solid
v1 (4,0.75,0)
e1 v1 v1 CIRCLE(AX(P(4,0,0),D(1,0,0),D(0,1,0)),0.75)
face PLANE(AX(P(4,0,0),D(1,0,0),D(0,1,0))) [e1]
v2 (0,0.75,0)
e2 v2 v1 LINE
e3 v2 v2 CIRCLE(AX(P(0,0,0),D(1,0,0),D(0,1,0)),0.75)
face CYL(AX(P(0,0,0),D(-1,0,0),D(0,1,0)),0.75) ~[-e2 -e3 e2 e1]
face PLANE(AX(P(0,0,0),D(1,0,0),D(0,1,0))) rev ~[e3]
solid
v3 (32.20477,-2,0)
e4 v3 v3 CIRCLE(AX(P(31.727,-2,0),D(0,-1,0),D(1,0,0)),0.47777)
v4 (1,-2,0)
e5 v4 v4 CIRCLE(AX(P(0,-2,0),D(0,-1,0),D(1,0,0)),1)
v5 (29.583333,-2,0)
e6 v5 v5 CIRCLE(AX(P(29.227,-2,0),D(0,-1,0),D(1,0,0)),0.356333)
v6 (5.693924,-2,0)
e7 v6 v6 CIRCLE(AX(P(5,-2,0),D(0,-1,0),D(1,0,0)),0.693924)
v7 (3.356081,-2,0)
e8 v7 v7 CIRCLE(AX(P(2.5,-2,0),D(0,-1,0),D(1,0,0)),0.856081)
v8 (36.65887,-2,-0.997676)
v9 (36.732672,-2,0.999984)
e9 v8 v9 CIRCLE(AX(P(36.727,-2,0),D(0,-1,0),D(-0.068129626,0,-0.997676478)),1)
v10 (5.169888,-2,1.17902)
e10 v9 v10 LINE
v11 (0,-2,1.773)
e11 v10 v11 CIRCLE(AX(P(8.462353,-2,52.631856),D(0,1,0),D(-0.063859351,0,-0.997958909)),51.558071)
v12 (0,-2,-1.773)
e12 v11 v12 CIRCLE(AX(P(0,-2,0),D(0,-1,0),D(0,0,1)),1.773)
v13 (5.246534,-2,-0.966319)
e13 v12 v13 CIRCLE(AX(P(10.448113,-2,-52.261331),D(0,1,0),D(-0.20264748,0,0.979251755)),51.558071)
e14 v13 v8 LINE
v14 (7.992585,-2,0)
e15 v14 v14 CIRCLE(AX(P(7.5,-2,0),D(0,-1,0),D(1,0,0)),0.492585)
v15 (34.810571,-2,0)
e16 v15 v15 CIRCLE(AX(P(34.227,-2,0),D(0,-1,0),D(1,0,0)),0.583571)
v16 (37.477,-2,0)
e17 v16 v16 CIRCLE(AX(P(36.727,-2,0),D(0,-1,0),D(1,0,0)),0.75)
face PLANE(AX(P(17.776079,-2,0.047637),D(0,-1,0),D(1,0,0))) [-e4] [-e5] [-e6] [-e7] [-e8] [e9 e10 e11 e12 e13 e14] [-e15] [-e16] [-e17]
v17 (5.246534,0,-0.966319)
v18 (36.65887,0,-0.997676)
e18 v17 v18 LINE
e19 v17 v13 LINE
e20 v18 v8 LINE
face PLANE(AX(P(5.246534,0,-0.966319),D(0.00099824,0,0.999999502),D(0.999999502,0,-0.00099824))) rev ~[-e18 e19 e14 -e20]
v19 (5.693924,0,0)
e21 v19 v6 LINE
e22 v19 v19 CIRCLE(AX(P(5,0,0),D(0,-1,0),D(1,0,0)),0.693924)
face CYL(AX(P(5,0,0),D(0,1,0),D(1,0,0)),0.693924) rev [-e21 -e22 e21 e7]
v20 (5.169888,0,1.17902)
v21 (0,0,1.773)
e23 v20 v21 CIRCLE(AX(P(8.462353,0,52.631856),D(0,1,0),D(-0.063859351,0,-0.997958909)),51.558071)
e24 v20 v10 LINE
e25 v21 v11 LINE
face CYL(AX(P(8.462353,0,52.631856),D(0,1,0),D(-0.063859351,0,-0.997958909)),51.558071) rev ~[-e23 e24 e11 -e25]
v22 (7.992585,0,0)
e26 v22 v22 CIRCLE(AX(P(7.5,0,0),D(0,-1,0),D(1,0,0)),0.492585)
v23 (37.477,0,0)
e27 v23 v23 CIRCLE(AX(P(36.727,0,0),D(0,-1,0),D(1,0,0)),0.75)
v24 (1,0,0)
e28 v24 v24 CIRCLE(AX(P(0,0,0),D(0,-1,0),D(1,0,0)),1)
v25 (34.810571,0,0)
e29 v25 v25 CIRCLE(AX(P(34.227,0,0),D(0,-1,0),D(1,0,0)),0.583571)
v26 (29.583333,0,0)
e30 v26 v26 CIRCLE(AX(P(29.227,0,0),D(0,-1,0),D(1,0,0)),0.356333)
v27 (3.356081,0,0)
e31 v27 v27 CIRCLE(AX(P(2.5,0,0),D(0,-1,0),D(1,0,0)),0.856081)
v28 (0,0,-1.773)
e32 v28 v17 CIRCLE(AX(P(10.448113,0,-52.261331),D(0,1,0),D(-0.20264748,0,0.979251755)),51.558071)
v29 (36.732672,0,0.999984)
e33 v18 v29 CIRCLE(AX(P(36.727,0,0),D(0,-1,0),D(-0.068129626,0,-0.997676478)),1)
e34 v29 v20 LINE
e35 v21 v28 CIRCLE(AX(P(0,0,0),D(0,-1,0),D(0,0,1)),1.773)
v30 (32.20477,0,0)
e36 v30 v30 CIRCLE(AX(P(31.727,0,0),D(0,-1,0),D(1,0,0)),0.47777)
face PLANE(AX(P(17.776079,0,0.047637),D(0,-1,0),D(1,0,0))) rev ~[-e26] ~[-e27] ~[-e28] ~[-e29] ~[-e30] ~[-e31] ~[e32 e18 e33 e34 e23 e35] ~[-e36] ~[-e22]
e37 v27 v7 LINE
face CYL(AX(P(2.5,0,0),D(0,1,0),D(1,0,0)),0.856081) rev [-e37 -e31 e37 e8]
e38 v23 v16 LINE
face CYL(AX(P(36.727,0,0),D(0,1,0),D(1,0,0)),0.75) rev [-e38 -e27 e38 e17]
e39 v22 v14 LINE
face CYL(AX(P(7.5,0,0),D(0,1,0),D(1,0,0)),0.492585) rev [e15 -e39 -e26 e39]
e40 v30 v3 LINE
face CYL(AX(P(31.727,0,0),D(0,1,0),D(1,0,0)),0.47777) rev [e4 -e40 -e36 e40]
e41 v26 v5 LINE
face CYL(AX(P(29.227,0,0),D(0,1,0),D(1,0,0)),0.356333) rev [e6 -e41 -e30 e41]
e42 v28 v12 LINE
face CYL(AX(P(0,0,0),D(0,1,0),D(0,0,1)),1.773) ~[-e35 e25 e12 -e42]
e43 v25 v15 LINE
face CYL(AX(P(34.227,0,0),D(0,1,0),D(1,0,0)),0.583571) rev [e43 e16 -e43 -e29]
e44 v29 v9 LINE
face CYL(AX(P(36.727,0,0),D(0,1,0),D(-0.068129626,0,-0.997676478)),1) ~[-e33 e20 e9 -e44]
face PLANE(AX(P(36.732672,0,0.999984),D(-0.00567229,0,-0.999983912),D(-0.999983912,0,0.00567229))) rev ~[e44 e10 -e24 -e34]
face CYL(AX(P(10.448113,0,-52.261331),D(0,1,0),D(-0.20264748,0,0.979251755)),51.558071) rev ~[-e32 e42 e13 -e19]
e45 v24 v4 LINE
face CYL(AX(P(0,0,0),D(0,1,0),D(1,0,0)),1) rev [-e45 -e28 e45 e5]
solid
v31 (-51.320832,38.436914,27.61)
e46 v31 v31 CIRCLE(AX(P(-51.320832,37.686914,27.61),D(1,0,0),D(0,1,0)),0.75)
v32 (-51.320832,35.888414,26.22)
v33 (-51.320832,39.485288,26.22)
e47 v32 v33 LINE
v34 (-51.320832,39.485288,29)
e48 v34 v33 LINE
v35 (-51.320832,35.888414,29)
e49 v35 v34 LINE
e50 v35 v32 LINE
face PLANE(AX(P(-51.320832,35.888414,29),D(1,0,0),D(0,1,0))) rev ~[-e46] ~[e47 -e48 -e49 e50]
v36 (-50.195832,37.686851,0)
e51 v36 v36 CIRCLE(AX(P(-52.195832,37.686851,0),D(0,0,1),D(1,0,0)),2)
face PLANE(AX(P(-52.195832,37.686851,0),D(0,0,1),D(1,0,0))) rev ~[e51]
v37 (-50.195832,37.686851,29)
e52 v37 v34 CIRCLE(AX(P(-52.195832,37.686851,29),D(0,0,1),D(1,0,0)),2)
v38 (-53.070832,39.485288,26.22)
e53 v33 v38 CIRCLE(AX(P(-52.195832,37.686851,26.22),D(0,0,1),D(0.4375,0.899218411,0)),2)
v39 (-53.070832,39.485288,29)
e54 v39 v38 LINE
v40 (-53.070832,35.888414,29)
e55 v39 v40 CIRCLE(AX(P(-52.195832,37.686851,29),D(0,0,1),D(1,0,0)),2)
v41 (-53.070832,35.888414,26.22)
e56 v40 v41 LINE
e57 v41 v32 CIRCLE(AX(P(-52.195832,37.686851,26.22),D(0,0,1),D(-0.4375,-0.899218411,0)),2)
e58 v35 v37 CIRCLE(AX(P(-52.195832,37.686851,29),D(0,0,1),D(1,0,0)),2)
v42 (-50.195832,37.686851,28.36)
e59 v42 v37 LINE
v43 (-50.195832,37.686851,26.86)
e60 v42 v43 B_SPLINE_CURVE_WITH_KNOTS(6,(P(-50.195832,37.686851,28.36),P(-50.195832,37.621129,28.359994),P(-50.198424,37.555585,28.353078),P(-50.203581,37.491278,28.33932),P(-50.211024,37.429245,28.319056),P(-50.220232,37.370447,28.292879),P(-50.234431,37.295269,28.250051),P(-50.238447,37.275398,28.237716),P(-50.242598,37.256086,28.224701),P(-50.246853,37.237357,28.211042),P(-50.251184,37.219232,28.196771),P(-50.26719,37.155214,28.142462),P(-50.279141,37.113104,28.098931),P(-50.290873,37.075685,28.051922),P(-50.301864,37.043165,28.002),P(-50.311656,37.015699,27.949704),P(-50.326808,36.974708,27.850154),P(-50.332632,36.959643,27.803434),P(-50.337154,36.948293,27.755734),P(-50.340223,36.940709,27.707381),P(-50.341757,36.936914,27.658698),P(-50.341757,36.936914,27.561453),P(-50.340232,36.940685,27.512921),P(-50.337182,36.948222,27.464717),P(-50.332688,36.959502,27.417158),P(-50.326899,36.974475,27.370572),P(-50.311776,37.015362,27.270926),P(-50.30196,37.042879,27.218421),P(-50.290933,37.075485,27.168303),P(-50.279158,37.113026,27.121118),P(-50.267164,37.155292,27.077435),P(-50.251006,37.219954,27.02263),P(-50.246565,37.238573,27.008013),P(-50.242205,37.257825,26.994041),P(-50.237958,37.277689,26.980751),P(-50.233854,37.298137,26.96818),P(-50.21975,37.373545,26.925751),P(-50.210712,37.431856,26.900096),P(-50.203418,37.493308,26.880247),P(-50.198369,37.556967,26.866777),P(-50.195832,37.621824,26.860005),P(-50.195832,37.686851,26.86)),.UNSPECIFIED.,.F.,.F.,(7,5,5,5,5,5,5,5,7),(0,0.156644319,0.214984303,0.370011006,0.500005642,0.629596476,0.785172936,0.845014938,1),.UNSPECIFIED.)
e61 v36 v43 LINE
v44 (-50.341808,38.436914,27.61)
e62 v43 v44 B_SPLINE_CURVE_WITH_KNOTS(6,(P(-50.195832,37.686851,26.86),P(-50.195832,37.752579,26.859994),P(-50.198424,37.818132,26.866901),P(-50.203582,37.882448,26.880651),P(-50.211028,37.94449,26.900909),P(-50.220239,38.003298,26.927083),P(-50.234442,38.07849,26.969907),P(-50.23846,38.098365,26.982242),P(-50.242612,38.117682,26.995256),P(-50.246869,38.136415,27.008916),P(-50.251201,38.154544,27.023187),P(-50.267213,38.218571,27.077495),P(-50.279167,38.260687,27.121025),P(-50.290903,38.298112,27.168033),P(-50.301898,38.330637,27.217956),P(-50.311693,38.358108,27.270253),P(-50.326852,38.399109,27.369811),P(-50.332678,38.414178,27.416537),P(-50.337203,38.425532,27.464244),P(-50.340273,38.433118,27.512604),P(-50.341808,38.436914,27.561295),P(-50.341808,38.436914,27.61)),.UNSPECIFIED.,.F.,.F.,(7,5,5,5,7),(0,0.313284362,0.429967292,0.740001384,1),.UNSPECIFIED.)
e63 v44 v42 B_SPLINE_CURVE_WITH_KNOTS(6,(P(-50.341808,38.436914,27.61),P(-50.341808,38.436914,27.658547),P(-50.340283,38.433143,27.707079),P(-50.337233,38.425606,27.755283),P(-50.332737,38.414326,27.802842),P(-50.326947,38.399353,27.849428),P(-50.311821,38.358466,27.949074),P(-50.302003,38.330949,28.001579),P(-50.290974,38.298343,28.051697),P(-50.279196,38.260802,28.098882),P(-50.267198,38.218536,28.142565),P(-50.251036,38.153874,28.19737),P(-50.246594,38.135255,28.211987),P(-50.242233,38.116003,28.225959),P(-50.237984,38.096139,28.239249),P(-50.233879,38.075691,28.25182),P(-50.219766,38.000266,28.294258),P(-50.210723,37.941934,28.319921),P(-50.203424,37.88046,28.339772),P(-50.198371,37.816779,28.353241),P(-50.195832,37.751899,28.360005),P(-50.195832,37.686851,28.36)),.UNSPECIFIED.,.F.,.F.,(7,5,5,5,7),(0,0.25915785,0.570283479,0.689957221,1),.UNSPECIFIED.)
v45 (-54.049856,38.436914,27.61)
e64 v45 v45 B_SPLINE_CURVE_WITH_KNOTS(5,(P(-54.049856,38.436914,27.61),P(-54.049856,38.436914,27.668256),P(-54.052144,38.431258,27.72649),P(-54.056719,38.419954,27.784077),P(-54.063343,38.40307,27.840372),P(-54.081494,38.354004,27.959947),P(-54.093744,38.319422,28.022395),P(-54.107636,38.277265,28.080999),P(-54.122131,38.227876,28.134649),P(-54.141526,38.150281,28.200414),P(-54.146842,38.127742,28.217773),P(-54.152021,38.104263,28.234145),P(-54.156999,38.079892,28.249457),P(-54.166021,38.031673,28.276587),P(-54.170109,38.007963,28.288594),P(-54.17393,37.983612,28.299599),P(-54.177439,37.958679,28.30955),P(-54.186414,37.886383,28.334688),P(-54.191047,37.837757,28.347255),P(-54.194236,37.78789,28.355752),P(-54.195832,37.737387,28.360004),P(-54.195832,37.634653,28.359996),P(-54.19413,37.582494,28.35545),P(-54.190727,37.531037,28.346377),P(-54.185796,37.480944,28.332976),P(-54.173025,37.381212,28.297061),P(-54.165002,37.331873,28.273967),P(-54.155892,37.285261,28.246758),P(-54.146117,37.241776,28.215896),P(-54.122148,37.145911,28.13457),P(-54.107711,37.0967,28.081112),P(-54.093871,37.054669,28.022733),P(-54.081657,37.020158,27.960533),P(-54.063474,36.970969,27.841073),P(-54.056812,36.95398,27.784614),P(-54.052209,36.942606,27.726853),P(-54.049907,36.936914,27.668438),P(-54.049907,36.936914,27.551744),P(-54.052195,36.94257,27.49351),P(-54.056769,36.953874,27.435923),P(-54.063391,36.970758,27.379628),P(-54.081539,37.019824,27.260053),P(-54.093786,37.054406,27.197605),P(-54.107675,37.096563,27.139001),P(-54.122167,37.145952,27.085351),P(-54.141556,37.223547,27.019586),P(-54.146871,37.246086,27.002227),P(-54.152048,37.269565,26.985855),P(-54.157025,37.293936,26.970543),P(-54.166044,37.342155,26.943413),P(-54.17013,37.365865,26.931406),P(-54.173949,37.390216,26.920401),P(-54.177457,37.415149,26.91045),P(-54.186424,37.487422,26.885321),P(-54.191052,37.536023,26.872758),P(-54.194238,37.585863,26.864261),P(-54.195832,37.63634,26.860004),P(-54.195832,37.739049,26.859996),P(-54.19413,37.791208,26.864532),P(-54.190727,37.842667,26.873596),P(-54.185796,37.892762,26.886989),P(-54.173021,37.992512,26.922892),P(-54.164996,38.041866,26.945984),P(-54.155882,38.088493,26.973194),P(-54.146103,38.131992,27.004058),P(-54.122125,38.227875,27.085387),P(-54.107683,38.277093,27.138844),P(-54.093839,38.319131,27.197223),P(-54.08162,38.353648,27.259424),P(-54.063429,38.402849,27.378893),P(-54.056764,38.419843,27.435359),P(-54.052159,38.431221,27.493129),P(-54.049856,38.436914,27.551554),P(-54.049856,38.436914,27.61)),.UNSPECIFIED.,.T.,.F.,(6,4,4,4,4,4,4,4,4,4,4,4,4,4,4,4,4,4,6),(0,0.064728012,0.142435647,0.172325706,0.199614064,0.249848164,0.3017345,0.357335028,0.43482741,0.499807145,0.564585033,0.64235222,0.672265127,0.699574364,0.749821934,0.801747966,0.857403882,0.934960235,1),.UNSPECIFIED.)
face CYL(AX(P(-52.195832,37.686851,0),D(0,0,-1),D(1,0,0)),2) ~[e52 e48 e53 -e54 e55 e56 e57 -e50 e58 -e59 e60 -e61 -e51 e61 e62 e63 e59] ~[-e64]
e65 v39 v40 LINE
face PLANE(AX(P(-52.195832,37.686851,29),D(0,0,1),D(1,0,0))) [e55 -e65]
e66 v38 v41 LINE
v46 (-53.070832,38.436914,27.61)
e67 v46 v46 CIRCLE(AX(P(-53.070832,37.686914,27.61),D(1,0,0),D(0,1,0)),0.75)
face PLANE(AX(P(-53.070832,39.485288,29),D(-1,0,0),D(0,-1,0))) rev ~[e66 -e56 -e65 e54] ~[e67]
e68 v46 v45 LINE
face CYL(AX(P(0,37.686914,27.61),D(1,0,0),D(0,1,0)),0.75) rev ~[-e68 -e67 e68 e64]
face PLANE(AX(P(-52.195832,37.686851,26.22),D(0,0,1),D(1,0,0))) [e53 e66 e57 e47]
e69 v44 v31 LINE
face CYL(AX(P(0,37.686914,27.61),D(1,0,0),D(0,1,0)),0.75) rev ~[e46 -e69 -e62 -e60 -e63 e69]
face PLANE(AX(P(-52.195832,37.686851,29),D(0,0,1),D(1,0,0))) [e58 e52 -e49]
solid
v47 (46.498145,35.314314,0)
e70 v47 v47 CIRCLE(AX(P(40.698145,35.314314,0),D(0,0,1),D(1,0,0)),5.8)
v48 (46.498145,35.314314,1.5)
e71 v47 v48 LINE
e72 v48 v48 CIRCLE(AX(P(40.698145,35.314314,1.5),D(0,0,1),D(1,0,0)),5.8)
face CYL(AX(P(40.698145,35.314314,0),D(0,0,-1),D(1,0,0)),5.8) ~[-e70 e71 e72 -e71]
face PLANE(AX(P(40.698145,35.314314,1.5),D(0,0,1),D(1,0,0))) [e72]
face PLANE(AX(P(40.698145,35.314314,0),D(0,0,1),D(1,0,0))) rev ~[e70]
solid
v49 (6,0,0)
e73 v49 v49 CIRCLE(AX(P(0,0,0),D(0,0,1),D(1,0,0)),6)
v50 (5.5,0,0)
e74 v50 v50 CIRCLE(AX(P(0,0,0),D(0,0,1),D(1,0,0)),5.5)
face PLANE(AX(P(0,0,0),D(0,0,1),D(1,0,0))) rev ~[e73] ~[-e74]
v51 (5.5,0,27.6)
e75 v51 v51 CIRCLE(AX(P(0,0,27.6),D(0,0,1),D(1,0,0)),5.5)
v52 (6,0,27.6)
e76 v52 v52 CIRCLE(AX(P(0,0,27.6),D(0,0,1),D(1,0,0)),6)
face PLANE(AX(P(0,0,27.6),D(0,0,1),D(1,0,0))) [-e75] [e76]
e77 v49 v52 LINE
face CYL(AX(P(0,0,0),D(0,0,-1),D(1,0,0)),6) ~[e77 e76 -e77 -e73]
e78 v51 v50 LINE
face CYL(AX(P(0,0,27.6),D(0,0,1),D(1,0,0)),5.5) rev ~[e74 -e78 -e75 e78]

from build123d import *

# Parameters (mm, degrees)
F2_R      = 5.8
F3_DEPTH  = 1.5
F4_R      = 2
F5_DEPTH  = 29
F7_DEPTH  = 2.78
F0_R      = 6
F8_DEPTH  = 27.6
F9_R      = 5.5
F10_DEPTH = 27.6
F11_R     = 1
F11_R_2   = 0.8560808417
F11_R_3   = 0.6939243984
F11_R_4   = 0.4925851038
F11_R_5   = 0.3563326194
F11_R_6   = 0.4777702974
F11_R_7   = 0.5835711178
F11_R_8   = 0.75
F12_DEPTH = 2
F13_R     = 0.75
F14_DEPTH = 4
F15_R     = 0.75
F16_DEPTH = 54.1968321333


# Not quite as in the source:
# - the program builds the solid bodies; features that only make, move or delete a surface that nothing else refers to are left out


with BuildPart() as f3:
    # F2 (on Top) → F3 (new body)
    with BuildSketch(Plane.XY):
        with Locations((40.6981445849, 35.3143140674)):
            Circle(F2_R)
    extrude(amount=F3_DEPTH)


with BuildPart() as f5:
    # F4 (on Top) → F5 (new body)
    with BuildSketch(Plane.XY):
        with Locations((-52.1958321333, 37.6868508756)):
            Circle(F4_R)
    extrude(amount=F5_DEPTH)

    # F6 (on face) → F7 (cut)
    with BuildSketch(Plane.XY.offset(29)):
        with BuildLine():
            ThreePointArc((-51.3208321333, 39.4852876969), (-52.1958321333, 39.6868508756), (-53.0708321333, 39.4852876969))
            Line((-53.0708321333, 39.4852876969), (-53.0708321333, 35.8884140544))
            ThreePointArc((-53.0708321333, 35.8884140544), (-52.1958321333, 35.6868508756), (-51.3208321333, 35.8884140544))
            Line((-51.3208321333, 35.8884140544), (-51.3208321333, 39.4852876969))
        make_face()
    extrude(amount=-F7_DEPTH, mode=Mode.SUBTRACT)

    # F15 (on Right) → F16 (cut, through all)
    with BuildSketch(Plane.YZ):
        with Locations((37.6869140544, 27.61)):
            Circle(F15_R)
    extrude(amount=-F16_DEPTH, mode=Mode.SUBTRACT)


with BuildPart() as f8:
    # F0 (on Top) → F8 (new body)
    with BuildSketch(Plane.XY):
        Circle(F0_R)
    extrude(amount=F8_DEPTH)

    # F9 (on face) → F10 (cut)
    with BuildSketch(Plane.XY.offset(27.6)):
        Circle(F9_R)
    extrude(amount=-F10_DEPTH, mode=Mode.SUBTRACT)


with BuildPart() as f12:
    # F11 (on Front) → F12 (new body)
    with BuildSketch(Plane.XZ):
        with BuildLine():
            ThreePointArc((5.169888125, 1.1790200467), (2.5774452808, 1.4107420589), (0, 1.773))
            ThreePointArc((0, 1.773), (-1.773, 0), (0, -1.773))
            ThreePointArc((0, -1.773), (2.6128788251, -1.3020949548), (5.2465344779, -0.9663194069))
            Line((5.2465344779, -0.9663194069), (36.6588703738, -0.9976764776))
            ThreePointArc((36.6588703738, -0.9976764776), (37.7263182617, -0.0369189891), (36.7326722897, 0.9999839124))
            Line((36.7326722897, 0.9999839124), (5.169888125, 1.1790200467))
        make_face()
        Circle(F11_R, mode=Mode.SUBTRACT)
        with Locations((2.5, 0)):
            Circle(F11_R_2, mode=Mode.SUBTRACT)
        with Locations((5, 0)):
            Circle(F11_R_3, mode=Mode.SUBTRACT)
        with Locations((7.5, 0)):
            Circle(F11_R_4, mode=Mode.SUBTRACT)
        with Locations((29.227, 0)):
            Circle(F11_R_5, mode=Mode.SUBTRACT)
        with Locations((31.727, 0)):
            Circle(F11_R_6, mode=Mode.SUBTRACT)
        with Locations((34.227, 0)):
            Circle(F11_R_7, mode=Mode.SUBTRACT)
        with Locations((36.727, 0)):
            Circle(F11_R_8, mode=Mode.SUBTRACT)
    extrude(amount=F12_DEPTH)


with BuildPart() as f14:
    # F13 (on Right) → F14 (new body)
    with BuildSketch(Plane.YZ):
        Circle(F13_R)
    extrude(amount=F14_DEPTH)


solid = Compound([f3.part, f5.part, f8.part, f12.part, f14.part])
